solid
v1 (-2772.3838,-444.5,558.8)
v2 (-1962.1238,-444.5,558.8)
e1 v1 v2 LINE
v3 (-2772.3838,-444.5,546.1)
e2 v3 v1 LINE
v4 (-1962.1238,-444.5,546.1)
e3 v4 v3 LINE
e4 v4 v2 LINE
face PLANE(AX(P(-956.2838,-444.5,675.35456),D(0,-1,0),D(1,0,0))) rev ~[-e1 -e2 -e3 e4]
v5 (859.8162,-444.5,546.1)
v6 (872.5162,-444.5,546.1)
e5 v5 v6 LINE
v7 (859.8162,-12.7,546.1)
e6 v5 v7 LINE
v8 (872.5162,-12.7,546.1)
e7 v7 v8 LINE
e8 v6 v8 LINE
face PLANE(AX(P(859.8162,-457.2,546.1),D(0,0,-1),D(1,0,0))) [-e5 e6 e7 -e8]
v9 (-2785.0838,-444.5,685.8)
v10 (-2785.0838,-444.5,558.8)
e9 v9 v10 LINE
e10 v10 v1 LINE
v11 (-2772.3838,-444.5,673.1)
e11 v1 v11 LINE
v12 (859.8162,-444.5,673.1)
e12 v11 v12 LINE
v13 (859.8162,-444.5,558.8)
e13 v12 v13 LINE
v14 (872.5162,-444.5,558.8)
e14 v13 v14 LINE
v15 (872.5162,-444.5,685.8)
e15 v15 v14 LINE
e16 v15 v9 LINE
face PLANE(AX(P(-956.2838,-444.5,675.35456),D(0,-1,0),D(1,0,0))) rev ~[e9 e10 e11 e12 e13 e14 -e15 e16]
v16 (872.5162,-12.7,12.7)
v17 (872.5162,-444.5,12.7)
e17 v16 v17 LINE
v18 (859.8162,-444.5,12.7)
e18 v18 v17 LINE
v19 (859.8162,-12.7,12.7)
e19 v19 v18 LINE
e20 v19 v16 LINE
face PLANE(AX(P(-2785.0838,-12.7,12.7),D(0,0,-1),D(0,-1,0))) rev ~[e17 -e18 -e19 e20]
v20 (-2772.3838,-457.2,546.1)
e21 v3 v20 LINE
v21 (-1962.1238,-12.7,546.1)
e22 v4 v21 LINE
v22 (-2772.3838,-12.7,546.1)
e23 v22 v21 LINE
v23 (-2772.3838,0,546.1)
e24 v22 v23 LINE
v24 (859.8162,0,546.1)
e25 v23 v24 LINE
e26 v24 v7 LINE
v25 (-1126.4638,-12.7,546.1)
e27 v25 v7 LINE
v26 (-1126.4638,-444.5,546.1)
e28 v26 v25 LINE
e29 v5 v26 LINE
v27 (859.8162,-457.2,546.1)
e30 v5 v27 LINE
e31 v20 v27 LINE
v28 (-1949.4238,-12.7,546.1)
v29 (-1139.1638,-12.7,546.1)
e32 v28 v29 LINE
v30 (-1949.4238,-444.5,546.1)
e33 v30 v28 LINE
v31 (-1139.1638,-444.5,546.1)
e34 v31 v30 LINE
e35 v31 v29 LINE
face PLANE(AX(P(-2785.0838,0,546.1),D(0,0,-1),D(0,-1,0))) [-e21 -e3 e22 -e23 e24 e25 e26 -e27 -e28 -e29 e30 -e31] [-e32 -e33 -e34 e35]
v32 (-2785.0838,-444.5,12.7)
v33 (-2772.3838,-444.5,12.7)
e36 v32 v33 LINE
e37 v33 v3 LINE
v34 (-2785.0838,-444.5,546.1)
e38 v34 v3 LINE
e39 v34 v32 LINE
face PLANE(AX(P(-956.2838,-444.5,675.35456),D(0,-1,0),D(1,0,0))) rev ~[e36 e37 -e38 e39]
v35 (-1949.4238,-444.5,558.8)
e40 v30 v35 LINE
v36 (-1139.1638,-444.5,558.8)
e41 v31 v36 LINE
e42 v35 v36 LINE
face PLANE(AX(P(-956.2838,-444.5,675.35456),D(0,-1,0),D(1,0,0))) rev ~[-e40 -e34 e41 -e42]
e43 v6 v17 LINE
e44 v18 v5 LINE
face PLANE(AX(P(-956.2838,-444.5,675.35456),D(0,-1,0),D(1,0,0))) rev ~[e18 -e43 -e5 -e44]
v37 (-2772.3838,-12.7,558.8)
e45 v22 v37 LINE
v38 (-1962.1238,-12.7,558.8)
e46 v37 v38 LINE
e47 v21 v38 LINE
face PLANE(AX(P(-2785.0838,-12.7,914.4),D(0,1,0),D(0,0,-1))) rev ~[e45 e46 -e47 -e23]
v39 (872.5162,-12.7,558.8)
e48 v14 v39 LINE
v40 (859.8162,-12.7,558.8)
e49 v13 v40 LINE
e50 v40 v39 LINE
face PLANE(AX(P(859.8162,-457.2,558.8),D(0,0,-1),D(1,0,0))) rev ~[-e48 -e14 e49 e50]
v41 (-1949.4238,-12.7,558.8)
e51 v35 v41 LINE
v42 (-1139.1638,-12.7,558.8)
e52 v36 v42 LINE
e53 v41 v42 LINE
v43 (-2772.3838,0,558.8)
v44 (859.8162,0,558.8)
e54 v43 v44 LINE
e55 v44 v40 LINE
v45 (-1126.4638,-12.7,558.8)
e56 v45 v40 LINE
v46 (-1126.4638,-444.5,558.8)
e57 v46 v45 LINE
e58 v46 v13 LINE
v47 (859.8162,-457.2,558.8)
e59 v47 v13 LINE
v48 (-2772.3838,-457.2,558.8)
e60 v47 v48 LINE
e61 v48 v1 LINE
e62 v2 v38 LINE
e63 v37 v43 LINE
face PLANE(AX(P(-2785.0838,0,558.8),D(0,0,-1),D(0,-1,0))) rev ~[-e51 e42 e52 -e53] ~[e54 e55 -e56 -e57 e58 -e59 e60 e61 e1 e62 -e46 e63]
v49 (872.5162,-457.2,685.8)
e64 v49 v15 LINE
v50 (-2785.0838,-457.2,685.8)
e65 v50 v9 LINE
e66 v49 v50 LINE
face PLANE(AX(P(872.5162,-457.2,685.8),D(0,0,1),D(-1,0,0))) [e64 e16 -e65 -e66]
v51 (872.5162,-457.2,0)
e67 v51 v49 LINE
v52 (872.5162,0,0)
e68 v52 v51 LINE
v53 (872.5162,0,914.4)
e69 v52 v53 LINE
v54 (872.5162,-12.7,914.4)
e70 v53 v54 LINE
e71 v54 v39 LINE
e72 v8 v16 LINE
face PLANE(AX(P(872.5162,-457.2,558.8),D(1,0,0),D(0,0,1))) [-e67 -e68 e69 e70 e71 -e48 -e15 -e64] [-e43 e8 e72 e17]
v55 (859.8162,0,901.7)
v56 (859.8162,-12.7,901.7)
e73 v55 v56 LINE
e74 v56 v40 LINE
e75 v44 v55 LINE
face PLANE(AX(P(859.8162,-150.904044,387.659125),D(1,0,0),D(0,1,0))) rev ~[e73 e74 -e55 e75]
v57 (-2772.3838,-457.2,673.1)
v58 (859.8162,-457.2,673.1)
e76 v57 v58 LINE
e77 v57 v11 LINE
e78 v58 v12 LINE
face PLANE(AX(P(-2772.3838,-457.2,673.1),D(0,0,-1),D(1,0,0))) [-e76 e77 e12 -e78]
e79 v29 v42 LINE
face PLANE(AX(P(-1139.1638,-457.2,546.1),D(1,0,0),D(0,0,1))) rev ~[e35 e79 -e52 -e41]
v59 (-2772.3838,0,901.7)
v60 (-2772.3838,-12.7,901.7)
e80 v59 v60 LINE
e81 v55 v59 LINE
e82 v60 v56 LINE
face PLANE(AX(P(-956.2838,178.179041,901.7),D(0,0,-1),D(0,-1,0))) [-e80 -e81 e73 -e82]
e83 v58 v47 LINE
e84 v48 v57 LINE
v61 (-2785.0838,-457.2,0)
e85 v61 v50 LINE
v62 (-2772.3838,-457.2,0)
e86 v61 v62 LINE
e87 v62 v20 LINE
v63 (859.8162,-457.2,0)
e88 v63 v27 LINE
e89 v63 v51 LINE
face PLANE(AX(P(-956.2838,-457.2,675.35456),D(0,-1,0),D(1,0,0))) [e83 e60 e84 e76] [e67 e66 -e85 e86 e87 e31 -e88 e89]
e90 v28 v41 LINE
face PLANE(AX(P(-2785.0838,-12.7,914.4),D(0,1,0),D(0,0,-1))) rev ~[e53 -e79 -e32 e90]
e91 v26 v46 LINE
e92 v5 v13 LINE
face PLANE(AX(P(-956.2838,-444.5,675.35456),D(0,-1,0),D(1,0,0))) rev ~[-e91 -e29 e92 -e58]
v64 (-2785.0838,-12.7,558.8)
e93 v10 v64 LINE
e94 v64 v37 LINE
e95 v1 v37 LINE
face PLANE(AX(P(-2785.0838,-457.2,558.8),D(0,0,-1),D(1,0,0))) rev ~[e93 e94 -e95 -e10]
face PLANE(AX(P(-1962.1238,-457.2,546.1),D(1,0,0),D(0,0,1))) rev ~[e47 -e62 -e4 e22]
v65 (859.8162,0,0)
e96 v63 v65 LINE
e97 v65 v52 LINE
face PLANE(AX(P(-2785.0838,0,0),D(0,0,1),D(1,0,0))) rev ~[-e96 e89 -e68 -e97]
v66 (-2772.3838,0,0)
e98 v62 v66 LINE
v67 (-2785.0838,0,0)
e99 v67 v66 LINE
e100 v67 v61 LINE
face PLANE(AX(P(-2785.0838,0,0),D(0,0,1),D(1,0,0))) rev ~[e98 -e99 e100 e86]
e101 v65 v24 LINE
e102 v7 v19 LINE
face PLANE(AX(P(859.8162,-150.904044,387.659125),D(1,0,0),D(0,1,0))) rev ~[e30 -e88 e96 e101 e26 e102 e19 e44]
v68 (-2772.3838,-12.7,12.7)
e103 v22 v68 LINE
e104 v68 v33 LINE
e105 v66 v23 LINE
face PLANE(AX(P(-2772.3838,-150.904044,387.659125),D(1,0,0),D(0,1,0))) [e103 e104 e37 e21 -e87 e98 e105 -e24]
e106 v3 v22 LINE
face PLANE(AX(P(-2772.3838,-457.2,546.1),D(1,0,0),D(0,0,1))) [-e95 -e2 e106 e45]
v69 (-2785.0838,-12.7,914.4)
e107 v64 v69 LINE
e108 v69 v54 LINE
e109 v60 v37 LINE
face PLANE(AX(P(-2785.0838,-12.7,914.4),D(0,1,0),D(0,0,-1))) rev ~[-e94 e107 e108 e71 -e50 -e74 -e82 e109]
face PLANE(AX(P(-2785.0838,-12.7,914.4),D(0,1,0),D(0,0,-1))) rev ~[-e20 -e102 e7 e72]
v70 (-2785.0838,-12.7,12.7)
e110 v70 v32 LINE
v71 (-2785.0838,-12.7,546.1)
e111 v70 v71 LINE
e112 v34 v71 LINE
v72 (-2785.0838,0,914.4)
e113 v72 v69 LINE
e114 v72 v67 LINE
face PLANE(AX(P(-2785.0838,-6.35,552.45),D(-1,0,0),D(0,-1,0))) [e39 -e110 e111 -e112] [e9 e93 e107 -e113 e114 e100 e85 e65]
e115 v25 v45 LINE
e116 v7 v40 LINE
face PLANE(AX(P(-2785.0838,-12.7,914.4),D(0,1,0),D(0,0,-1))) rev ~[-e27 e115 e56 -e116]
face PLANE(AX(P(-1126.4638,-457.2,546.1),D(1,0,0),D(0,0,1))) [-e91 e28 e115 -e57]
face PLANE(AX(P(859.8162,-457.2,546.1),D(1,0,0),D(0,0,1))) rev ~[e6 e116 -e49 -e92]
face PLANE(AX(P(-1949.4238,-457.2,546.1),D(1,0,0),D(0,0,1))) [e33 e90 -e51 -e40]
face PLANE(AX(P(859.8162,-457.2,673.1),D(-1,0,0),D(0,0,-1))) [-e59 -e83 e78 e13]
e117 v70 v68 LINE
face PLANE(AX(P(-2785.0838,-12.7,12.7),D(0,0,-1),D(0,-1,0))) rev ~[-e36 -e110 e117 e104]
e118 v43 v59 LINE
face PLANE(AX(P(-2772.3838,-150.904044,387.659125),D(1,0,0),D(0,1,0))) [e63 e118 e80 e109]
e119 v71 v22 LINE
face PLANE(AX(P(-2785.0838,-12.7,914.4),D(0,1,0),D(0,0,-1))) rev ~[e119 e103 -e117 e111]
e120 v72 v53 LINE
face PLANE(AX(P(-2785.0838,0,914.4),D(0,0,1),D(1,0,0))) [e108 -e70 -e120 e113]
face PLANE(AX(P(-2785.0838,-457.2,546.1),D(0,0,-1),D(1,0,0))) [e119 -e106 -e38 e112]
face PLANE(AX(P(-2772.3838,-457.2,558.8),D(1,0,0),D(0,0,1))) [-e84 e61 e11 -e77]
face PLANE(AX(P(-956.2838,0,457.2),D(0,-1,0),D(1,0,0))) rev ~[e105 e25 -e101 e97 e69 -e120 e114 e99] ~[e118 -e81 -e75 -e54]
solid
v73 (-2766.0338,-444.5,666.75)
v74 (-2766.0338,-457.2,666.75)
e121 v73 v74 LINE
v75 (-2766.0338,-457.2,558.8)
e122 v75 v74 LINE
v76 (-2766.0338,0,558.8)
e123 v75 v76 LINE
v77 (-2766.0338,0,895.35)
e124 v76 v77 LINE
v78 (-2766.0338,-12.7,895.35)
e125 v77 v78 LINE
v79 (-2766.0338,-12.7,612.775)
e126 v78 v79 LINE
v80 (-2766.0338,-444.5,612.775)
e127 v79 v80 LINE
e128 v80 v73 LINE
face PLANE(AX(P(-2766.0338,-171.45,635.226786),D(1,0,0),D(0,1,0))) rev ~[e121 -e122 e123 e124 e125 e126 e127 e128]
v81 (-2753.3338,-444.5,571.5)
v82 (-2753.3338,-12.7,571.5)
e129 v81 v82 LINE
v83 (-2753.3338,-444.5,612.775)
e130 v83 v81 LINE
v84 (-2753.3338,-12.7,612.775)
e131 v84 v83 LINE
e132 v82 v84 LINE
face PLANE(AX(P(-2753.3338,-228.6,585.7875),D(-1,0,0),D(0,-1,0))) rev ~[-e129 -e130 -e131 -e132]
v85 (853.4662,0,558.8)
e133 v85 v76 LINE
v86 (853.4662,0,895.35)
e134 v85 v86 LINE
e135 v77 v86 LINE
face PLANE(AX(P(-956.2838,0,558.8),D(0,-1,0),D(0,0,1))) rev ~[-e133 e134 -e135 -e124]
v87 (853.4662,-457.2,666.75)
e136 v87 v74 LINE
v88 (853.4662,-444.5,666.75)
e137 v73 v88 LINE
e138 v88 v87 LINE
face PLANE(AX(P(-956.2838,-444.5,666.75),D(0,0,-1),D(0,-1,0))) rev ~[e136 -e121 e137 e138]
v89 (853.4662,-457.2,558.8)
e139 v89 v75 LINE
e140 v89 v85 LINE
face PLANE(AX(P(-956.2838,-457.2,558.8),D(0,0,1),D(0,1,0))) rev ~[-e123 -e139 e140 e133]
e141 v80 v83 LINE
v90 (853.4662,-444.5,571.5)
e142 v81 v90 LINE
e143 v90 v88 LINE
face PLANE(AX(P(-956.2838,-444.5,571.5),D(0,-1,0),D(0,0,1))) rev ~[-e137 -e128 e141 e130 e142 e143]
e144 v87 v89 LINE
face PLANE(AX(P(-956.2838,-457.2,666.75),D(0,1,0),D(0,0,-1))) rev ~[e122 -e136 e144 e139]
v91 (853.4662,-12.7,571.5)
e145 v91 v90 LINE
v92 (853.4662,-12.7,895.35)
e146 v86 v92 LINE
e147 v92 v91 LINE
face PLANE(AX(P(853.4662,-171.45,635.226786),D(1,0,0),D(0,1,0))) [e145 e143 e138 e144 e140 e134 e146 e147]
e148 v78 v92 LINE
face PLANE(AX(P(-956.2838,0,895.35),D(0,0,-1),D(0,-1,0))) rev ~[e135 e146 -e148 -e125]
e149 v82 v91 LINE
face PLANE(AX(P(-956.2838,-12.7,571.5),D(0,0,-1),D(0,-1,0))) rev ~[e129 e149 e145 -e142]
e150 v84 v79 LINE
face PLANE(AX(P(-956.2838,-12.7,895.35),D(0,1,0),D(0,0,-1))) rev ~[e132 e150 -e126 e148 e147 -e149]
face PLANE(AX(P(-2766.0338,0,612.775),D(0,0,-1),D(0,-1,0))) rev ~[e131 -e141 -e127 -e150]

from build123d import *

# Parameters (mm, degrees)
F0_W      = 3657.6
F0_H      = 914.4
F1_DEPTH  = 457.2
F3_DEPTH  = 3657.6
F7_DEPTH  = 1816.1
F8_DEPTH  = 1816.1
F10_DEPTH = 12.7
F11_W     = 12.7
F11_H     = 12.7
F12_DEPTH = 3644.9
F13_W     = 12.7
F13_H     = 12.7
F14_DEPTH = 444.5
F16_DEPTH = 1809.75
F17_DEPTH = 1809.75
F18_W     = 457.2
F18_H     = 53.975
F19_DEPTH = 12.7


with BuildPart() as f1:
    # F0 (on Front) → F1 (new body)
    with BuildSketch(Plane.XZ):
        with Locations((-956.2838003924, 457.2)):
            Rectangle(F0_W, F0_H)
    extrude(amount=F1_DEPTH)

    # F2 (on face) → F3 (cut, through all)
    with BuildSketch(Plane(origin=(-2785.0838003924, 0, 0), x_dir=(0, -1, 0), z_dir=(-1, 0, 0))):
        Polygon((457.2, 558.8), (457.2, 914.4), (12.7, 914.4), (12.7, 12.7), (444.5, 12.7), (444.5, 558.8), align=None)
    extrude(amount=-F3_DEPTH, mode=Mode.SUBTRACT)

    # F6 (on plane+point) → F7 (cut, through all)
    with BuildSketch(Plane.YZ.offset(-956.2838003924)):
        Polygon((178.1790405512, -48.0869802773), (178.1790405512, 901.7), (-187.0097050519, 901.7), (-187.0097050519, 546.1), (-558.2818984985, 546.1), (-558.2818984985, -48.0869802773), align=None)
    extrude(amount=-F7_DEPTH, mode=Mode.SUBTRACT)

    # F6 (on plane+point) → F8 (cut, through all)
    with BuildSketch(Plane.YZ.offset(-956.2838003924)):
        Polygon((178.1790405512, -48.0869802773), (178.1790405512, 901.7), (-187.0097050519, 901.7), (-187.0097050519, 546.1), (-558.2818984985, 546.1), (-558.2818984985, -48.0869802773), align=None)
    extrude(amount=F8_DEPTH, mode=Mode.SUBTRACT)

    # F9 (on face) → F10 (join, through all)
    with BuildSketch(Plane.XZ.offset(457.2)):
        Polygon((-2785.0838003924, 685.8), (-2785.0838003924, 558.8), (-2772.3838003924, 558.8), (-2772.3838003924, 673.1), (859.8161996076, 673.1), (859.8161996076, 558.8), (872.5161996076, 558.8), (872.5161996076, 685.8), align=None)
    extrude(amount=-F10_DEPTH)

    # F11 (on face) → F12 (join, through all)
    with BuildSketch(Plane(origin=(-2785.0838003924, 0, 0), x_dir=(0, -1, 0), z_dir=(-1, 0, 0))):
        with Locations((6.35, 552.45)):
            Rectangle(F11_W, F11_H)
    extrude(amount=-F12_DEPTH)

    # F13 (on face) → F14 (join, through all)
    with BuildSketch(Plane.XZ.offset(457.2)):
        with Locations((-2778.7338003924, 552.45)):
            Rectangle(F13_W, F13_H)
        with Locations((866.1661996076, 552.45)):
            Rectangle(F13_W, F13_H)
        with Locations((-1955.7738003924, 552.45)):
            Rectangle(F13_W, F13_H)
        with Locations((-1132.8138003924, 552.45)):
            Rectangle(F13_W, F13_H)
    extrude(amount=-F14_DEPTH)


with BuildPart() as f16:
    # F15 (on plane+point) → F16 (new body, through all)
    with BuildSketch(Plane.YZ.offset(-956.2838003924)):
        Polygon((0, 558.8), (0, 895.35), (-12.7, 895.35), (-12.7, 571.5), (-444.5, 571.5), (-444.5, 666.75), (-457.2, 666.75), (-457.2, 558.8), align=None)
    extrude(amount=-F16_DEPTH)

    # F15 (on plane+point) → F17 (join, through all)
    with BuildSketch(Plane.YZ.offset(-956.2838003924)):
        Polygon((0, 558.8), (0, 895.35), (-12.7, 895.35), (-12.7, 571.5), (-444.5, 571.5), (-444.5, 666.75), (-457.2, 666.75), (-457.2, 558.8), align=None)
    extrude(amount=F17_DEPTH)

    # F18 (on face) → F19 (join)
    with BuildSketch(Plane(origin=(-2766.0338003924, 0, 0), x_dir=(0, -1, 0), z_dir=(-1, 0, 0))):
        with Locations((228.6, 585.7875)):
            Rectangle(F18_W, F18_H)
    extrude(amount=-F19_DEPTH)


solid = Compound([f1.part, f16.part])
